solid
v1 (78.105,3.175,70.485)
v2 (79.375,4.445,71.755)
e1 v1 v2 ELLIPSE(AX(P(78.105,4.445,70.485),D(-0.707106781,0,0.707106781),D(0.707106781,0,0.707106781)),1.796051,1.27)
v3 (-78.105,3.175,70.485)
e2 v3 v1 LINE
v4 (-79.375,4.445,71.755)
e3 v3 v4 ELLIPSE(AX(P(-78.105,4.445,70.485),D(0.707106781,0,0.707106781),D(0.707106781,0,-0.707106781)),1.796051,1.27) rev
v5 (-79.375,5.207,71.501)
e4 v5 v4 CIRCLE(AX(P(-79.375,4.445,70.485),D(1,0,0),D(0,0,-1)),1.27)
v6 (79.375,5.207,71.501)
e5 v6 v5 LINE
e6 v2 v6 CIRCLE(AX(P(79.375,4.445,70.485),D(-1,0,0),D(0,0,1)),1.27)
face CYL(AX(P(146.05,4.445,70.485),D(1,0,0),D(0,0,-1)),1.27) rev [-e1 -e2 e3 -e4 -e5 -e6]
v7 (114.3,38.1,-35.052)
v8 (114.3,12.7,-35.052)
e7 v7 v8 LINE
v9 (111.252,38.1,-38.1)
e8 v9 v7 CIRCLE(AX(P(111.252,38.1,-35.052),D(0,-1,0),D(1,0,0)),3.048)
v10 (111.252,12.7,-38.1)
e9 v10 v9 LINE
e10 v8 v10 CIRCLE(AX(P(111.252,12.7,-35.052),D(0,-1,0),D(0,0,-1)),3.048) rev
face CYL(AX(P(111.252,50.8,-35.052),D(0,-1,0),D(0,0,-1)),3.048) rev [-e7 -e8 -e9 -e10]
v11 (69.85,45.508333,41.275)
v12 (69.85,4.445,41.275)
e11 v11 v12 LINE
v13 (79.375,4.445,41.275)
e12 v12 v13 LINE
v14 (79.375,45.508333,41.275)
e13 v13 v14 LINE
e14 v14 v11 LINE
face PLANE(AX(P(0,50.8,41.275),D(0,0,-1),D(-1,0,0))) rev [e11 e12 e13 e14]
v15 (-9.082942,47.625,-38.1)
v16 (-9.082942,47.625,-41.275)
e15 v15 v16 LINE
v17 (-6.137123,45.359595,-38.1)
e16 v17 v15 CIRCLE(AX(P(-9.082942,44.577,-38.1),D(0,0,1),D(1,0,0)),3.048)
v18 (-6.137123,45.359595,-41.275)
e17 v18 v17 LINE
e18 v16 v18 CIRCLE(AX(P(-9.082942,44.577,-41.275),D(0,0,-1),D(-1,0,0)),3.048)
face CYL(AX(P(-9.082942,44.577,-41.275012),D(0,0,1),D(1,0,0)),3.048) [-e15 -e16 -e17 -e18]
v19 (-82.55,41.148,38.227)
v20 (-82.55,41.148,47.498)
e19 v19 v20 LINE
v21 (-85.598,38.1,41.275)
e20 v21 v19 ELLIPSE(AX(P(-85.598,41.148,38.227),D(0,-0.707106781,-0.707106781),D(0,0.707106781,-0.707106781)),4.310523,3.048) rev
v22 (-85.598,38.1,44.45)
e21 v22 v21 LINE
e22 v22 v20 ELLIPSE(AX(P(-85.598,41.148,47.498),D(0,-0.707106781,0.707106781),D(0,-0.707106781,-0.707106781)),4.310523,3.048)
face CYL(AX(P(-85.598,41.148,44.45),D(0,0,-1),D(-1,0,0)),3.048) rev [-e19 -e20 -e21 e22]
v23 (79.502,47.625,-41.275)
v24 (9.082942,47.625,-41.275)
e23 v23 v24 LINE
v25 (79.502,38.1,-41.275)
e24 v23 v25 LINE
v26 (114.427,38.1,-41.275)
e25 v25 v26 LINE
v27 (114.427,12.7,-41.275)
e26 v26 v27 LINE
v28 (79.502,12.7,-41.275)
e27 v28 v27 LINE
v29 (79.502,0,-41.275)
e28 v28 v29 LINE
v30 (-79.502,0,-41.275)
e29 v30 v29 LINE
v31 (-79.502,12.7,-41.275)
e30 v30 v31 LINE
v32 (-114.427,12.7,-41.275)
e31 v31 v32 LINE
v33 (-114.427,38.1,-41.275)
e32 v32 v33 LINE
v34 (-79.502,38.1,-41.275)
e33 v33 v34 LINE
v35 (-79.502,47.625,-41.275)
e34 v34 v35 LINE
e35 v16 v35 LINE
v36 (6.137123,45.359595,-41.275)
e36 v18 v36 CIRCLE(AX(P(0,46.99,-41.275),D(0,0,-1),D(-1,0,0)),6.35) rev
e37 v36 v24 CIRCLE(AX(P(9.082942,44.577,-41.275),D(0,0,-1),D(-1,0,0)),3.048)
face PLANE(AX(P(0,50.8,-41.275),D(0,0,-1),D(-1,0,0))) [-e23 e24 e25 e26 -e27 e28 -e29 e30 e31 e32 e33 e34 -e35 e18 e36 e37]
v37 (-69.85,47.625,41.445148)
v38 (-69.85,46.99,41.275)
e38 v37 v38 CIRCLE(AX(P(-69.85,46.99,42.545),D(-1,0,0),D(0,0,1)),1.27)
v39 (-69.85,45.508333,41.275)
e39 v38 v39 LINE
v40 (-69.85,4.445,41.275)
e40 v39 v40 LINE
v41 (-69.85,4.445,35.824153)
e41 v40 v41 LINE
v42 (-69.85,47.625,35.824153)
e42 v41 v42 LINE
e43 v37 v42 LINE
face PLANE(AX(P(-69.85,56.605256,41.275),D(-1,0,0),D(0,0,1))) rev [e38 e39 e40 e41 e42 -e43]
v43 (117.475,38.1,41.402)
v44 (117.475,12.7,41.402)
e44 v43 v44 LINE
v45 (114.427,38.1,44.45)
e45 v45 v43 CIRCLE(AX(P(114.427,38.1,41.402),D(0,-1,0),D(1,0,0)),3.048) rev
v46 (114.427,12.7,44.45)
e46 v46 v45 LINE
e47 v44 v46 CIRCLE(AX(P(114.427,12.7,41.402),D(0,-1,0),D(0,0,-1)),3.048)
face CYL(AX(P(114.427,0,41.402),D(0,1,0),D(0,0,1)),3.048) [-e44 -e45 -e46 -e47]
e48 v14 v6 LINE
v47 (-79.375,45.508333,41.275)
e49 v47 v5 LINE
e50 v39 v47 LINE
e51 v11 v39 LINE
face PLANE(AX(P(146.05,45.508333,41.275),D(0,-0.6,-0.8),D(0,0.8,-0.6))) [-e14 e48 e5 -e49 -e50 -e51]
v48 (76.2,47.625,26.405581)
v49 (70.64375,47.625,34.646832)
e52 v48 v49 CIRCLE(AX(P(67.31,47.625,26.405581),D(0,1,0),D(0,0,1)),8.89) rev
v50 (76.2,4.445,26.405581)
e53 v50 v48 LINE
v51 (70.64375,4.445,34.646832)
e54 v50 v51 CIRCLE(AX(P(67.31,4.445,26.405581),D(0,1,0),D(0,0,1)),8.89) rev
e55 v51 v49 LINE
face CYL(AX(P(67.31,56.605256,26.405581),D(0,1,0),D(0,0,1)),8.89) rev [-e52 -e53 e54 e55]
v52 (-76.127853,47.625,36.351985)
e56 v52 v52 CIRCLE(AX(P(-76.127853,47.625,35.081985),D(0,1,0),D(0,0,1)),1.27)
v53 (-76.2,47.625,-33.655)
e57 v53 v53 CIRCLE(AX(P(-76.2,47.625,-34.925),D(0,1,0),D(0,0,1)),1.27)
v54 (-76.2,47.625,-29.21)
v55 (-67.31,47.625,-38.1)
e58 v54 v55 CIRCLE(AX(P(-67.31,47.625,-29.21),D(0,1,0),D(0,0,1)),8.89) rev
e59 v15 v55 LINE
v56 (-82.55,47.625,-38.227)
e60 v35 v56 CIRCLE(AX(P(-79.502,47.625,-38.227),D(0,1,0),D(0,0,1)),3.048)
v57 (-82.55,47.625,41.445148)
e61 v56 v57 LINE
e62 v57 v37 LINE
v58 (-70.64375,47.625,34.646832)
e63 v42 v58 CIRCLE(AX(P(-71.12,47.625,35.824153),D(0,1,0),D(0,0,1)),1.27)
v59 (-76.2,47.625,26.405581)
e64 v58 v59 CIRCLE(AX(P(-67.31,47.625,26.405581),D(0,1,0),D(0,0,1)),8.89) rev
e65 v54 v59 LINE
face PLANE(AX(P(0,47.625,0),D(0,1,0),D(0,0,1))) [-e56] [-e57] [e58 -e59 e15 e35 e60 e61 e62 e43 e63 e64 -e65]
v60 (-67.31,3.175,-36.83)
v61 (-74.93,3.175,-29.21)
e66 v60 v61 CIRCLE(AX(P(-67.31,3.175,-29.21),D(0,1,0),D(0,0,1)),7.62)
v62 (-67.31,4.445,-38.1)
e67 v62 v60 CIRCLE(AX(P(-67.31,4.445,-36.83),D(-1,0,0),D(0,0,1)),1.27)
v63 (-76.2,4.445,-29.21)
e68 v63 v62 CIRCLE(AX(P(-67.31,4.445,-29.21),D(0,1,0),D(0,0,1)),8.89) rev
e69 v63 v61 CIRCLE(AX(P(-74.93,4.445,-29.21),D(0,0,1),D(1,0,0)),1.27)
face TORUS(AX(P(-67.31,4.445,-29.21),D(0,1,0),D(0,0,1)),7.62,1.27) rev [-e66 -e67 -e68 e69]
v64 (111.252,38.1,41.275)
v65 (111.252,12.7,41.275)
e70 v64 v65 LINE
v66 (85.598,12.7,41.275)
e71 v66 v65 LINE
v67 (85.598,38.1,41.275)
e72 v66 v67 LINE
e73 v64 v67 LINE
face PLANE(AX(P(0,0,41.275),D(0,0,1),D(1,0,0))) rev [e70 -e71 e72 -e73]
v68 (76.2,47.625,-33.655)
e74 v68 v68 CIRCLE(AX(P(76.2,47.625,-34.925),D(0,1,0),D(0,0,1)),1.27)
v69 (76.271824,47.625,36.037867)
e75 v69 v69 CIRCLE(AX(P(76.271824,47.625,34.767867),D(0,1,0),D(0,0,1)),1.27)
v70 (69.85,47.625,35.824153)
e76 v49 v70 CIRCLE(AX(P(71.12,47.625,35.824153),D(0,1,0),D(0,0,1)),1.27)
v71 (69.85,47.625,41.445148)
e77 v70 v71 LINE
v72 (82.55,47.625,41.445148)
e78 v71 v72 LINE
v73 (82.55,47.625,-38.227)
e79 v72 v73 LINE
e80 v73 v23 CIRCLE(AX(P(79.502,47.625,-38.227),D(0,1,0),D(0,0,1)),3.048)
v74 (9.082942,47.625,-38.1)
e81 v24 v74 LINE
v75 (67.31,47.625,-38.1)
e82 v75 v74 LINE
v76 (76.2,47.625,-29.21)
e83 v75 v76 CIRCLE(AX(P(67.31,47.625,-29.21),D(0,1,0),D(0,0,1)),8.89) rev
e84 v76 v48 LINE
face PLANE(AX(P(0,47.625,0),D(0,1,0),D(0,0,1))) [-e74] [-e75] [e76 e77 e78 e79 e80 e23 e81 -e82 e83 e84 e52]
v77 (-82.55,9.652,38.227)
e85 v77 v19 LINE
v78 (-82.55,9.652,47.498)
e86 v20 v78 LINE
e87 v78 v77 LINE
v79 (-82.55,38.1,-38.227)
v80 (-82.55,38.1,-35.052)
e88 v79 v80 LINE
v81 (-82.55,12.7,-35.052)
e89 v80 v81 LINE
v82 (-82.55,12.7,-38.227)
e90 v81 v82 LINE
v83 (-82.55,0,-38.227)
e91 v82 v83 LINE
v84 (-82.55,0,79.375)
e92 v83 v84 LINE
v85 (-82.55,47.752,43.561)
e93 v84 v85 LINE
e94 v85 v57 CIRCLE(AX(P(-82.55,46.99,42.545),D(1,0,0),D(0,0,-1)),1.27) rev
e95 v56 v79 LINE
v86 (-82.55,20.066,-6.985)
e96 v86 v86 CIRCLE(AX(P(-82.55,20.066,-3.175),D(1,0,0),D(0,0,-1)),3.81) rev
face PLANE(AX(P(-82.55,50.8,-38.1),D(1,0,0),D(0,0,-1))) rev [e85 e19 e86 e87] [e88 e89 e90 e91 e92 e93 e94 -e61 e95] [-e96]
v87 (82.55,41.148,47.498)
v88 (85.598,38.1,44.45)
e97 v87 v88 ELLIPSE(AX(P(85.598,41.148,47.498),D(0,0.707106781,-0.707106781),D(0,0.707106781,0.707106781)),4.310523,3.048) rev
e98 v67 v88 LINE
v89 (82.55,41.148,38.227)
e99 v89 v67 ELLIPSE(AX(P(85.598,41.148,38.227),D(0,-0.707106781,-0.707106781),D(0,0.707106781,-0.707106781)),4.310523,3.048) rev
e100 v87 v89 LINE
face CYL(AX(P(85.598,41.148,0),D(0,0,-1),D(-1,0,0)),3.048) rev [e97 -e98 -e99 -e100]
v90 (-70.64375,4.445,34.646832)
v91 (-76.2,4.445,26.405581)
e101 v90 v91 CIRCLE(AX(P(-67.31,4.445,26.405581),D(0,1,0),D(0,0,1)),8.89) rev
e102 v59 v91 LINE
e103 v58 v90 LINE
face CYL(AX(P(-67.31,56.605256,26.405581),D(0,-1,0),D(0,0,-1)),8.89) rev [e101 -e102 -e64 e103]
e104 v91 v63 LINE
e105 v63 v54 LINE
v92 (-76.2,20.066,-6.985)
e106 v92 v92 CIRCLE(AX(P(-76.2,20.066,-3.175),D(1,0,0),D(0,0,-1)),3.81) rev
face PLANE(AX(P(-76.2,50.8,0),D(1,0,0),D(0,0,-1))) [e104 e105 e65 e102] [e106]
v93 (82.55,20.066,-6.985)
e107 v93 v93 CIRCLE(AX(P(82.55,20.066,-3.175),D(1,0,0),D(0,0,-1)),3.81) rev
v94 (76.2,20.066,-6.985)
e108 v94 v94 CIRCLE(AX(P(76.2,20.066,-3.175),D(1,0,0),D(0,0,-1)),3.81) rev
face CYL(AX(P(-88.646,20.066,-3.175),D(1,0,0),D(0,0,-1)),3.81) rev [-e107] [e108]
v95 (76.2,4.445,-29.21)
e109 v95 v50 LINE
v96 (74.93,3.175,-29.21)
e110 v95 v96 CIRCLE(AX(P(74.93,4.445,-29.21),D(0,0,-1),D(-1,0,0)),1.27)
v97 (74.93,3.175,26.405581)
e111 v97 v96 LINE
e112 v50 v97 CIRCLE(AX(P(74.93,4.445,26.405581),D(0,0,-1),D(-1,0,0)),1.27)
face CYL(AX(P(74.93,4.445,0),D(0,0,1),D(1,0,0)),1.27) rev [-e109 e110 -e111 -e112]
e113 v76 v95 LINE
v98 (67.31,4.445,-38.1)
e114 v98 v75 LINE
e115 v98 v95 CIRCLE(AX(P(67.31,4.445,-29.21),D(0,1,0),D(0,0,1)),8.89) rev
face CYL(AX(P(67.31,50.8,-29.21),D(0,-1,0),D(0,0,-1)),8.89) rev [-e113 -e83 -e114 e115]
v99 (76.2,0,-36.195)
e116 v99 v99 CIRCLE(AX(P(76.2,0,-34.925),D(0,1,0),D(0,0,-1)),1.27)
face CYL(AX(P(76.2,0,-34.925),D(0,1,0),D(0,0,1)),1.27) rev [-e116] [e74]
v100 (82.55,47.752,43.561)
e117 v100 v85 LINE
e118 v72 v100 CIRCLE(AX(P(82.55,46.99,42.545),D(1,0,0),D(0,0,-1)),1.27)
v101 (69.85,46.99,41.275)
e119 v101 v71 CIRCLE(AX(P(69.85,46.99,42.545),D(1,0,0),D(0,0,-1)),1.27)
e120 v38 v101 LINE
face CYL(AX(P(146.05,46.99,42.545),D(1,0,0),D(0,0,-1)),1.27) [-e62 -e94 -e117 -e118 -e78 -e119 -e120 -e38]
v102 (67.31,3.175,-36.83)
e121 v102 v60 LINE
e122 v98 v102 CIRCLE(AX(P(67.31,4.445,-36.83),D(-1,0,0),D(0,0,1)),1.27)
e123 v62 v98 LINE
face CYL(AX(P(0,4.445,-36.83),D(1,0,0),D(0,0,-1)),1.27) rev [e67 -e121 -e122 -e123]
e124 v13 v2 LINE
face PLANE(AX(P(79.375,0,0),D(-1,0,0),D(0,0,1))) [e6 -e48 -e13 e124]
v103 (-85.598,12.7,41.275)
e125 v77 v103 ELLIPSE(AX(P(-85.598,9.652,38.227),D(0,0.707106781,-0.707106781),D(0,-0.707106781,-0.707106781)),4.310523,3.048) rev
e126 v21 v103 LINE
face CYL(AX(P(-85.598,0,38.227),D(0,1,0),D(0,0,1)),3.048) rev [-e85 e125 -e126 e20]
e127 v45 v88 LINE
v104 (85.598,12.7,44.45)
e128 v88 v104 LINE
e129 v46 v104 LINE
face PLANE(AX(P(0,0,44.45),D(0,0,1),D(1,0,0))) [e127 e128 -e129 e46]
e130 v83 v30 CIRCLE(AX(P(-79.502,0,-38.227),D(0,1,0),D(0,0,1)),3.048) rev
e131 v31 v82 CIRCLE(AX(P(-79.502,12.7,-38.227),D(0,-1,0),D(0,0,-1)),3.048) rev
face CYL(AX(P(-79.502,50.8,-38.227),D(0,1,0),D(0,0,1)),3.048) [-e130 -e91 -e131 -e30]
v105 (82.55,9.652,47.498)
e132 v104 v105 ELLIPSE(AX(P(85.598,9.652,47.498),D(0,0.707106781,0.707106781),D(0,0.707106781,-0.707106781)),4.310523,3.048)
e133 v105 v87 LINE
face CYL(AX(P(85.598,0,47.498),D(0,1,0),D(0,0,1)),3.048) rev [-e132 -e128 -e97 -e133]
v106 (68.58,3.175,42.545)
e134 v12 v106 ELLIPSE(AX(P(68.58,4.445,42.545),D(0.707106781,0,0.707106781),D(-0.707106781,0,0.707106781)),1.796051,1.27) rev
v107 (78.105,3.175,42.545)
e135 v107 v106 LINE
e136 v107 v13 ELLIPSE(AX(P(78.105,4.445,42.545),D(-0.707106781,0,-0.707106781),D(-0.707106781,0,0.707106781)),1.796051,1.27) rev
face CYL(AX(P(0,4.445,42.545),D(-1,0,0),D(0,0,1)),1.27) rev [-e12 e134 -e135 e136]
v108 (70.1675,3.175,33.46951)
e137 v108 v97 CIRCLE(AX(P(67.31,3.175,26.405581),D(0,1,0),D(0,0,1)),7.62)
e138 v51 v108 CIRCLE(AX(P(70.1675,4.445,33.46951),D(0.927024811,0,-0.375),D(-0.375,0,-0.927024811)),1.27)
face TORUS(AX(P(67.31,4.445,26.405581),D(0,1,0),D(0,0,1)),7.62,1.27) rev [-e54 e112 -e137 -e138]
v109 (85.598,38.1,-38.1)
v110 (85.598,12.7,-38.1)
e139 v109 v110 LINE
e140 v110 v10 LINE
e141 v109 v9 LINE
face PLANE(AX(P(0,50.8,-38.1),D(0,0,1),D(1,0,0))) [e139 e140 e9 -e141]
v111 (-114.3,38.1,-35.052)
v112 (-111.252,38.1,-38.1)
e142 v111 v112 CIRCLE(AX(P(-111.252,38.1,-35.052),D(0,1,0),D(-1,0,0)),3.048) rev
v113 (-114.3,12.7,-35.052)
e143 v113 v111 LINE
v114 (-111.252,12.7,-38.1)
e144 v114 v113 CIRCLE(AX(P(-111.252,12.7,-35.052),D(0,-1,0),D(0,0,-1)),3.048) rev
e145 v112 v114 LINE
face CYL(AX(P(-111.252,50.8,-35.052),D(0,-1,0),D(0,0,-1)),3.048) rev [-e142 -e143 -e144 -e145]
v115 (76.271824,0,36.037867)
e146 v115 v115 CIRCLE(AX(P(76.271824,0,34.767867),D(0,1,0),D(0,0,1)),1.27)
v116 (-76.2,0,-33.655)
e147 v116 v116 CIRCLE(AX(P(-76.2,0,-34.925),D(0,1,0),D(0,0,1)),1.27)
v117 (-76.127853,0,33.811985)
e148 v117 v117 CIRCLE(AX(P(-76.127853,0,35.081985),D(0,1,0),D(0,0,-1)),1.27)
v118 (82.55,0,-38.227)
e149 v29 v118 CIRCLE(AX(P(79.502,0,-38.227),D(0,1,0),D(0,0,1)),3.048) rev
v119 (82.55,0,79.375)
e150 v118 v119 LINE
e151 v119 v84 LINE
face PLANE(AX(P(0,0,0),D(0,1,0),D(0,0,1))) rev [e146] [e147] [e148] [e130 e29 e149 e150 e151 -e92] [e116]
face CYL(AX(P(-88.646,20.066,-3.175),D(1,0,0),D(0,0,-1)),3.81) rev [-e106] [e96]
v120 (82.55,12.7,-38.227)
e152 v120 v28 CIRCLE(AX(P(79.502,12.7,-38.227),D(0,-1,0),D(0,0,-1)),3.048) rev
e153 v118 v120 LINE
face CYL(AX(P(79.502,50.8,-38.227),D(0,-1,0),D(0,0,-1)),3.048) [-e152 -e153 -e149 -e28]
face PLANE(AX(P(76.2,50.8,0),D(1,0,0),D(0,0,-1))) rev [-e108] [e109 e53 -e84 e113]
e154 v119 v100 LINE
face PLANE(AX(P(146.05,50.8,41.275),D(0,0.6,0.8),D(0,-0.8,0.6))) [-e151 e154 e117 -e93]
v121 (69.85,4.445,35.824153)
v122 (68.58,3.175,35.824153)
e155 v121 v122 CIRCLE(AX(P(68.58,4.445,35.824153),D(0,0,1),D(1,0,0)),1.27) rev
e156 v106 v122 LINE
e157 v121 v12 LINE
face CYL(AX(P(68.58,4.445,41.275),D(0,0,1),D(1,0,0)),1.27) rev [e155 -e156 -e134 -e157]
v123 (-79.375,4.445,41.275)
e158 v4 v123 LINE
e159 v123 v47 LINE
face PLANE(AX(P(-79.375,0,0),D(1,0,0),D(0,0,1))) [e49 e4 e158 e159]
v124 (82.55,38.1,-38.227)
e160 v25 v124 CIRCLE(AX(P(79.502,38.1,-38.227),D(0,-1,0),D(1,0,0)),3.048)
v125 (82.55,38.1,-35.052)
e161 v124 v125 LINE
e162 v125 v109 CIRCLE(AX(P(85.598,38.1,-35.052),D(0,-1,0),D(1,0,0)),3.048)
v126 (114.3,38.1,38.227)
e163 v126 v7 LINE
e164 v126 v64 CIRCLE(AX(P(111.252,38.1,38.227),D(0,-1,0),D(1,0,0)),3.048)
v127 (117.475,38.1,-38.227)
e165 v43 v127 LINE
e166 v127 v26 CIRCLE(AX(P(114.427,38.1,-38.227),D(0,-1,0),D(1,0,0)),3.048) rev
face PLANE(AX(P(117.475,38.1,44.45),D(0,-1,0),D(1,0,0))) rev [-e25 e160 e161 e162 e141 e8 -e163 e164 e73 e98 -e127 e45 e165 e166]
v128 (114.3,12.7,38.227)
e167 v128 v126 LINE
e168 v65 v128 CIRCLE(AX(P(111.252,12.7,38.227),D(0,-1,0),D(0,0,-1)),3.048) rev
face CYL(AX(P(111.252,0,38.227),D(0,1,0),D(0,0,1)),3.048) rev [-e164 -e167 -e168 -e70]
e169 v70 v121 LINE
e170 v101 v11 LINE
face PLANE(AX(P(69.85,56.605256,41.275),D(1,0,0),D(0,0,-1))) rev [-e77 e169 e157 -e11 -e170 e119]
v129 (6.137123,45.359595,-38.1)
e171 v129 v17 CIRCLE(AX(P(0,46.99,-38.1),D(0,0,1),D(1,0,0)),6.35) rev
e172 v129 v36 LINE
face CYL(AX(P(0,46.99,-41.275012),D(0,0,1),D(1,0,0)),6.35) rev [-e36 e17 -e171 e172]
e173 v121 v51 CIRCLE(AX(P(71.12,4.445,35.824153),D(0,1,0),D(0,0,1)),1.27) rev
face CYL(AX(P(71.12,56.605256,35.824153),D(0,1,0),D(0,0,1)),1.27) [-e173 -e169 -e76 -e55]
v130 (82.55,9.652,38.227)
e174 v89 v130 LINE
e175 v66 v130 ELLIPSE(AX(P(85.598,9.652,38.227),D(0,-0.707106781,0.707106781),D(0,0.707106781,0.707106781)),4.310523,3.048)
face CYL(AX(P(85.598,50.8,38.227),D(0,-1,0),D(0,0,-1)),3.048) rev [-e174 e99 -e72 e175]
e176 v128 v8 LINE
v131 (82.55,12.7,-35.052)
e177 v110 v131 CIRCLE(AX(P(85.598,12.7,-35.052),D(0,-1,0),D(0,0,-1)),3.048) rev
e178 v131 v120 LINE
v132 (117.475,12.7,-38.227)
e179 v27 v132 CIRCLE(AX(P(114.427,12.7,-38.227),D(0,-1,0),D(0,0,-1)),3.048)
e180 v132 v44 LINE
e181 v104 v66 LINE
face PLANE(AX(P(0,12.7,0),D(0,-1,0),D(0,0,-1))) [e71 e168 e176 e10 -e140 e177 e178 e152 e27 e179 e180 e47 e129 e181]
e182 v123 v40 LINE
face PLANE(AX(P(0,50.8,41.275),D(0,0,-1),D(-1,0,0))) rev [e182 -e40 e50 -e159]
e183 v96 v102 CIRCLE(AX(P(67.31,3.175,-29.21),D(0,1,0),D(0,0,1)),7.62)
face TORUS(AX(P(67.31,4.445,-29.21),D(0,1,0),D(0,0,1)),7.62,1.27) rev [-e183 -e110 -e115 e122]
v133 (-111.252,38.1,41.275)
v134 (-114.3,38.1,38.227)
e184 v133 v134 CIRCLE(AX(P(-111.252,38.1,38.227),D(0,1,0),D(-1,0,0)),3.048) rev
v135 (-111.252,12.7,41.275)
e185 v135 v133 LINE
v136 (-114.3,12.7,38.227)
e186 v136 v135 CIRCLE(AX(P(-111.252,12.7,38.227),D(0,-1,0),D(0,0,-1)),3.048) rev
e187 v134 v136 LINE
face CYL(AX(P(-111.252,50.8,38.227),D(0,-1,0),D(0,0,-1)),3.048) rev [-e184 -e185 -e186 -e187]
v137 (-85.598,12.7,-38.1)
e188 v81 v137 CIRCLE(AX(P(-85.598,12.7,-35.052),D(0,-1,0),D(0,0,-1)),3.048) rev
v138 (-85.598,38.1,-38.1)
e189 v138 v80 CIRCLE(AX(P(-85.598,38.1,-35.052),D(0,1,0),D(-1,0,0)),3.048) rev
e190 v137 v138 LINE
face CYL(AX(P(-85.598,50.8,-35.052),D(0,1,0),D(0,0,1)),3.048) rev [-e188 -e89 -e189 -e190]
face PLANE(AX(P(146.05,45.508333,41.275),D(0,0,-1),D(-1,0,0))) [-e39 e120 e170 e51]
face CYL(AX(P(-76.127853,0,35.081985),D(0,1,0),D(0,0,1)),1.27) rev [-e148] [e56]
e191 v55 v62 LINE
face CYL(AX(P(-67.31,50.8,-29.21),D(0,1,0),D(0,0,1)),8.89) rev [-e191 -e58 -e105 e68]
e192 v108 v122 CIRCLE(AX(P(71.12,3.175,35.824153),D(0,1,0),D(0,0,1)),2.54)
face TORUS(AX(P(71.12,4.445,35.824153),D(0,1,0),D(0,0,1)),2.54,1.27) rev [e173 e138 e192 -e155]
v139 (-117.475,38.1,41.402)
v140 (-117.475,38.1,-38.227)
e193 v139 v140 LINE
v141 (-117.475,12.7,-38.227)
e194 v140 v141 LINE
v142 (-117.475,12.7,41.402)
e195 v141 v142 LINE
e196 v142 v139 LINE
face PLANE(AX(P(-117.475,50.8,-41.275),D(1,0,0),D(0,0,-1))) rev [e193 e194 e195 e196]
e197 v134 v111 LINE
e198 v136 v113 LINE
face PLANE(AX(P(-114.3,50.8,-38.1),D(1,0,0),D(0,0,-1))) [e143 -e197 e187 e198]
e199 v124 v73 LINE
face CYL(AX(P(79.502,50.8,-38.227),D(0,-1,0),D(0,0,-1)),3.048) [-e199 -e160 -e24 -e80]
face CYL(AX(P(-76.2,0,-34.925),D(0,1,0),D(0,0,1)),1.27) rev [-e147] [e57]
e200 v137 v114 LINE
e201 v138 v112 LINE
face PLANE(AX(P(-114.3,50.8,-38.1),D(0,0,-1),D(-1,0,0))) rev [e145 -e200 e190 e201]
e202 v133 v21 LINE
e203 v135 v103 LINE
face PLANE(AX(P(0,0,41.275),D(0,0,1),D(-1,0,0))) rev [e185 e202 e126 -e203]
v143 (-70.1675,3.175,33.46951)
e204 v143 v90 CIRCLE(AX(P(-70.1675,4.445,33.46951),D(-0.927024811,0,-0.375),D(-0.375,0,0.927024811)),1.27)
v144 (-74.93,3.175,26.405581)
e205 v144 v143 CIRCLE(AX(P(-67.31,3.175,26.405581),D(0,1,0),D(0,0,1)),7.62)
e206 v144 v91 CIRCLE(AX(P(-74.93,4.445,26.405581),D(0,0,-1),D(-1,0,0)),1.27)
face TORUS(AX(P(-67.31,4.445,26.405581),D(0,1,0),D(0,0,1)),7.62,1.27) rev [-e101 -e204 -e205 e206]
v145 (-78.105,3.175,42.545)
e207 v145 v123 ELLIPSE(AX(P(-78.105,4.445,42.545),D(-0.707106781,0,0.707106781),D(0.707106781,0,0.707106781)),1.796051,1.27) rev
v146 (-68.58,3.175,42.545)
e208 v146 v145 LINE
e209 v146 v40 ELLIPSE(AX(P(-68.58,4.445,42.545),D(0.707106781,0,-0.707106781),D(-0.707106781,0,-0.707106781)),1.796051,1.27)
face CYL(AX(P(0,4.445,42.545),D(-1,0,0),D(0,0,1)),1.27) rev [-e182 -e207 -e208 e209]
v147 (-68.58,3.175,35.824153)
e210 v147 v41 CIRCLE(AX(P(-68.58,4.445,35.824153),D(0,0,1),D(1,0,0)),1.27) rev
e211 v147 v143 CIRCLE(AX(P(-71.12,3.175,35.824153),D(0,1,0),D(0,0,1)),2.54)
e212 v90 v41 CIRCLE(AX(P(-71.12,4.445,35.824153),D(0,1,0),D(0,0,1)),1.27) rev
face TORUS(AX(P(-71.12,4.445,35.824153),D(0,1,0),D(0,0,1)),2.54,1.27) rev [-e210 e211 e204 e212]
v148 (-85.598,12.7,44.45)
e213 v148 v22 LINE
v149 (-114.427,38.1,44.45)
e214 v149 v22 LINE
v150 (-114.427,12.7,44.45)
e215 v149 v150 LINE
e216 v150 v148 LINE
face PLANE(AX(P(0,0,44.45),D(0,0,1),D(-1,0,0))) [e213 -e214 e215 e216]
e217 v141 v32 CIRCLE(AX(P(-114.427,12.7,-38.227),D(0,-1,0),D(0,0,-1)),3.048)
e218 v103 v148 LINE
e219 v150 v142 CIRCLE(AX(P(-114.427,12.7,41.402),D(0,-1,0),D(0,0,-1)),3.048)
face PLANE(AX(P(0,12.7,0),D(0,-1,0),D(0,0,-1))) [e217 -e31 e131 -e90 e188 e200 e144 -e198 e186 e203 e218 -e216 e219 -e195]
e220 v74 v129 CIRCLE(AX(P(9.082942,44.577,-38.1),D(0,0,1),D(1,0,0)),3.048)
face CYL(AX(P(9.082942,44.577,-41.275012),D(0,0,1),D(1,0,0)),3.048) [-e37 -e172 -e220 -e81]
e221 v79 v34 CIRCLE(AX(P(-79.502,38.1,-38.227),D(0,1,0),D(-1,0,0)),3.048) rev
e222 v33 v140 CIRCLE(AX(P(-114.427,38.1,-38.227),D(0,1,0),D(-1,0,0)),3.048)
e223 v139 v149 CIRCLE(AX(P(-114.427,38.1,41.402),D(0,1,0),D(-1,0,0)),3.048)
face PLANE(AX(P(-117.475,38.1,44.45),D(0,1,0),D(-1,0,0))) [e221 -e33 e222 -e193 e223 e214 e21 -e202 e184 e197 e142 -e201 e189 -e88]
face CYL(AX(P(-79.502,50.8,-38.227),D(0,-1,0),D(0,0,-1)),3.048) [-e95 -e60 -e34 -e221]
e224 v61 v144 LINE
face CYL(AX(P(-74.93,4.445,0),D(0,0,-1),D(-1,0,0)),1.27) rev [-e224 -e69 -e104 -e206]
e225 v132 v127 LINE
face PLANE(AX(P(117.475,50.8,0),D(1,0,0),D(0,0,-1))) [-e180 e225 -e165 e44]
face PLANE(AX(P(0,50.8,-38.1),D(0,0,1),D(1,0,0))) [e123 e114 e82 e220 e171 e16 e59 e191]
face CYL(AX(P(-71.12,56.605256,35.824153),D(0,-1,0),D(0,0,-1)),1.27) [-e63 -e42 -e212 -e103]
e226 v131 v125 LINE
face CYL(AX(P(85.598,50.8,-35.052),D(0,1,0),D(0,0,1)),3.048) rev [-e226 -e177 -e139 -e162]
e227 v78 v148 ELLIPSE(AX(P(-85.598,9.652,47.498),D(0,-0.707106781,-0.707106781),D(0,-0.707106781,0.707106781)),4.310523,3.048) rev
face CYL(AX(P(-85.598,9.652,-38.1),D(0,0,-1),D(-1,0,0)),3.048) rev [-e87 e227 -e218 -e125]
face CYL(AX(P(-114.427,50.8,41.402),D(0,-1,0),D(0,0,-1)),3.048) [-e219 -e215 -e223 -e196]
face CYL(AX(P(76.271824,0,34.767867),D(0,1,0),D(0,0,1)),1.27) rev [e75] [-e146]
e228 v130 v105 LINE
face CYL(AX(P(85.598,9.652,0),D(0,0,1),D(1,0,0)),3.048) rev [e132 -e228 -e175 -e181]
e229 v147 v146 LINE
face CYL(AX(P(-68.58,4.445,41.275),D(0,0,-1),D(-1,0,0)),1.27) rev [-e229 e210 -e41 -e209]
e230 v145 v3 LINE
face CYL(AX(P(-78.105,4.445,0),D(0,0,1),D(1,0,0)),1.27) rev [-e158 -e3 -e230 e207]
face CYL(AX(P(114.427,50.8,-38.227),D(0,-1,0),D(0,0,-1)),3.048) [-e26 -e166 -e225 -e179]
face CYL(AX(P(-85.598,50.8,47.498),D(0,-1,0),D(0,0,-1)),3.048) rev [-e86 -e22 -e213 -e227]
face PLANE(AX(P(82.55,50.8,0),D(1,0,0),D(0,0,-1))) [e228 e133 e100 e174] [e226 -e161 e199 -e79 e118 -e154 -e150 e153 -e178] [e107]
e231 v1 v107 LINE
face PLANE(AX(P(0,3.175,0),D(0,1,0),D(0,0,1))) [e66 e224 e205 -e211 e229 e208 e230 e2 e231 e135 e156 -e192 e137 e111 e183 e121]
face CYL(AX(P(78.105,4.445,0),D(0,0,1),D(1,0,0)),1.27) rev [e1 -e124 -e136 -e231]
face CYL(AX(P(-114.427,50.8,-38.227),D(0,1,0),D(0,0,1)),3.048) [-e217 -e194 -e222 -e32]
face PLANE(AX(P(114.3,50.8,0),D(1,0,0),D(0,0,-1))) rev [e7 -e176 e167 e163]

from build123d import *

# Parameters (mm, degrees)
SKETCH1_W               = 152.4
SKETCH1_H               = 76.2
BOSS_EXTRUDE1_DEPTH     = 50.8
SKETCH1_3_W             = 152.4
SKETCH1_3_H             = 76.2
BOSS_EXTRUDE2_DEPTH     = 3.175
SKETCH8_W               = 152.4
SKETCH8_H               = 47.625
CUT_EXTRUDE1_DEPTH      = 6.35
BOSS_EXTRUDE10_REACH    = 212.462
BOSS_EXTRUDE11_DEPTH    = 3.175
SKETCH12_W              = 34.925
SKETCH12_H              = 38.1
BOSS_EXTRUDE12_DEPTH    = 3.175
CUT_EXTRUDE2_DEPTH      = 153.300748931
CUT_EXTRUDE2_DEPTH_BACK = 153.300748931
SKETCH13_W              = 34.925
SKETCH13_H              = 12.7
SKETCH14_W              = 34.925
SKETCH14_H              = 85.725
CUT_EXTRUDE3_DEPTH      = 12.7
CUT_EXTRUDE4_DEPTH      = 6.096
CUT_EXTRUDE4_DEPTH_BACK = 173.99
SKETCH16_R              = 3.81
SKETCH17_W              = 165.1
SKETCH17_H              = 82.55
CUT_EXTRUDE5_DEPTH      = 3.175
SKETCH25_W              = 6.35
SKETCH25_H              = 6.35
BOSS_EXTRUDE16_DEPTH    = 44.45
FILLET2_R               = 8.89
FILLET3_R               = 1.27
CUT_EXTRUDE8_DEPTH      = 150.562384559
CUT_EXTRUDE8_DEPTH_BACK = 150.562384559
SKETCH26_R              = 1.27
FILLET4_R               = 3.048
CUT_EXTRUDE9_DEPTH      = 176.173701579
CUT_EXTRUDE9_DEPTH_BACK = 7.366
SKETCH27_R              = 6.35
FILLET5_R               = 3.048


with BuildPart() as part:
    # Sketch1 → Boss-Extrude1 (new body)
    with BuildSketch(Plane(origin=(0, 0, 0), x_dir=(1, 0, 0), z_dir=(0, 1, 0))):
        Polygon((-117.475, 41.275), (-117.475, -41.275), (-114.3, -41.275), (-114.3, 38.1), (-82.55, 38.1), (-82.55, -41.275), (82.55, -41.275), (82.55, 38.1), (114.3, 38.1), (114.3, -41.275), (117.475, -41.275), (117.475, 41.275), align=None)
        Rectangle(SKETCH1_W, SKETCH1_H, mode=Mode.SUBTRACT)
    extrude(amount=BOSS_EXTRUDE1_DEPTH)

    # Sketch1<3> → Boss-Extrude2 (add)
    with BuildSketch(Plane(origin=(0, 0, 0), x_dir=(1, 0, 0), z_dir=(0, 1, 0))):
        Rectangle(SKETCH1_3_W, SKETCH1_3_H)
    extrude(amount=BOSS_EXTRUDE2_DEPTH)

    # Sketch8 → Cut-Extrude1 (cut)
    with BuildSketch(Plane.XY.offset(41.275)):
        with Locations((0, 26.9875)):
            Rectangle(SKETCH8_W, SKETCH8_H)
    extrude(amount=-CUT_EXTRUDE1_DEPTH, mode=Mode.SUBTRACT)

    # Boss-Extrude10: up to this face of the body (flat: up to its plane)
    boss_extrude10_end = Plane(part.part.faces().sort_by_distance((82.55, 25.4, 1.5875))[0])
    # Sketch10 → Boss-Extrude10 (add, up to the picked face)
    with BuildSketch(Plane.ZY.offset(82.55), mode=Mode.PRIVATE) as boss_extrude10_sk1:
        Polygon((41.275, 50.8), (79.375, 0), (41.275, 0), (41.275, 3.175), (73.025, 3.175), (41.275, 45.508333333), align=None)
    boss_extrude10_tool1 = split(extrude(boss_extrude10_sk1.sketch, amount=-BOSS_EXTRUDE10_REACH, mode=Mode.PRIVATE), bisect_by=boss_extrude10_end, keep=Keep.BOTH, mode=Mode.PRIVATE)
    add(boss_extrude10_tool1.solids().sort_by(Axis((-82.55, 25.019, 59.817), (1, 0, 0)))[0])

    # Sketch11 → Boss-Extrude11 (add)
    with BuildSketch(Plane(origin=(82.55, 0, 0), x_dir=(0, 0, -1), z_dir=(1, 0, 0))):
        Polygon((-41.275, 45.508333333), (-73.025, 3.175), (-41.275, 3.175), align=None)
    boss_extrude11 = extrude(amount=-BOSS_EXTRUDE11_DEPTH)

    # Sketch12 → Boss-Extrude12 (add)
    with BuildSketch(Plane.XY.offset(41.275)):
        with Locations((100.0125, 19.05)):
            Rectangle(SKETCH12_W, SKETCH12_H)
    boss_extrude12 = extrude(amount=BOSS_EXTRUDE12_DEPTH)

    # Mirror2: Boss-Extrude11 across plane
    add(boss_extrude11.mirror(Plane(origin=(0, 0, 0), x_dir=(0, 0, 1), z_dir=(1, 0, 0))))

    # Mirror3: Boss-Extrude12 across plane
    add(boss_extrude12.mirror(Plane(origin=(0, 0, 0), x_dir=(0, 0, 1), z_dir=(1, 0, 0))))

    # Sketch13 → Cut-Extrude2 (cut, two sides: drawn at the far end of the back side and taken through both)
    with BuildSketch(Plane.XY.offset(41.275).offset(-CUT_EXTRUDE2_DEPTH_BACK)):
        with Locations((100.0125, 44.45)):
            Rectangle(SKETCH13_W, SKETCH13_H)
        with Locations((-100.0125, 44.45)):
            Rectangle(SKETCH13_W, SKETCH13_H)
    extrude(amount=CUT_EXTRUDE2_DEPTH + CUT_EXTRUDE2_DEPTH_BACK, mode=Mode.SUBTRACT)

    # Sketch14 → Cut-Extrude3 (cut)
    with BuildSketch(Plane(origin=(0, 0, 0), x_dir=(-1, 0, 0), z_dir=(0, -1, 0))):
        with Locations((-100.0125, -1.5875)):
            Rectangle(SKETCH14_W, SKETCH14_H)
    cut_extrude3 = extrude(amount=-CUT_EXTRUDE3_DEPTH, mode=Mode.SUBTRACT)

    # Mirror4: Cut-Extrude3 across plane
    add(cut_extrude3.mirror(Plane(origin=(0, 0, 0), x_dir=(0, 0, 1), z_dir=(1, 0, 0))), mode=Mode.SUBTRACT)

    # Sketch16 → Cut-Extrude4 (cut, two sides: drawn at the far end of the back side and taken through both)
    with BuildSketch(Plane.ZY.offset(82.55).offset(-CUT_EXTRUDE4_DEPTH_BACK)):
        with Locations(Location((-3.175, 20.066, 0), (0, 0, 180))):
            Circle(SKETCH16_R)
    extrude(amount=CUT_EXTRUDE4_DEPTH + CUT_EXTRUDE4_DEPTH_BACK, mode=Mode.SUBTRACT)

    # Sketch17 → Cut-Extrude5 (cut)
    with BuildSketch(Plane(origin=(0, 50.8, 0), x_dir=(1, 0, 0), z_dir=(0, 1, 0))):
        Rectangle(SKETCH17_W, SKETCH17_H)
    extrude(amount=-CUT_EXTRUDE5_DEPTH, mode=Mode.SUBTRACT)

    # Sketch25 → Boss-Extrude16 (add)
    with BuildSketch(Plane(origin=(0, 3.175, 0), x_dir=(1, 0, 0), z_dir=(0, 1, 0))):
        with Locations((73.025, -38.1)):
            Rectangle(SKETCH25_W, SKETCH25_H)
        with Locations((-73.025, -38.1)):
            Rectangle(SKETCH25_W, SKETCH25_H)
    extrude(amount=BOSS_EXTRUDE16_DEPTH)

    # Fillet2
    # the kernel refuses this fillet: 8.89 mm, written as the material it adds along each edge
    with BuildSketch(Plane(origin=(76.2, 3.175, 34.925), x_dir=(0, 0, -1), z_dir=(0, 1, 0))) as fillet2_piece_1:
        with BuildLine():
            CenterArc((8.519418994, 8.89), FILLET2_R, 196.601549599, 73.398450401)
            Line((0, 6.35), (-0.17038838, 6.2992))
            ThreePointArc((-0.17038838, 6.2992), (-0.1778, 3.175), (-0.1778, 0))
            Line((-0.1778, 0), (0, -0.1778))
            Line((0, -0.1778), (8.519418994, -0.1778))
            Line((8.519418994, -0.1778), (8.519418994, 0))
        make_face()
    extrude(amount=44.45)
    with BuildSketch(Plane(origin=(76.2, 3.175, -38.1), x_dir=(-1, 0, 0), z_dir=(0, 1, 0)), Plane(origin=(-76.2, 3.175, -38.1), x_dir=(0, 0, 1), z_dir=(0, 1, 0))) as fillet2_piece_2:
        with BuildLine():
            CenterArc((FILLET2_R, FILLET2_R), FILLET2_R, 180, 90)
            Line((0, FILLET2_R), (-FILLET2_R * 0.02, FILLET2_R))
            Line((-FILLET2_R * 0.02, FILLET2_R), (-FILLET2_R * 0.02, -FILLET2_R * 0.02))
            Line((-FILLET2_R * 0.02, -FILLET2_R * 0.02), (FILLET2_R, -FILLET2_R * 0.02))
            Line((FILLET2_R, -FILLET2_R * 0.02), (FILLET2_R, 0))
        make_face()
    extrude(amount=44.45)
    with BuildSketch(Plane(origin=(-76.2, 3.175, 34.925), x_dir=(1, 0, 0), z_dir=(0, 1, 0))) as fillet2_piece_3:
        with BuildLine():
            CenterArc((8.89, 8.519418994), FILLET2_R, 180, 73.398450401)
            Line((0, 8.519418994), (-0.1778, 8.519418994))
            Line((-0.1778, 8.519418994), (-0.1778, 0))
            Line((-0.1778, 0), (0, -0.1778))
            ThreePointArc((0, -0.1778), (3.175, -0.1778), (6.2992, -0.17038838))
            Line((6.2992, -0.17038838), (6.35, 0))
        make_face()
    extrude(amount=44.45)

    # Fillet3
    fillet3_edges = [part.edges().sort_by_distance(p)[0] for p in [
        (74.6125, 3.175, 41.275),
        (79.375, 3.175, 57.15),
        (0, 3.175, 73.025),
        (-79.375, 3.175, 57.15),
        (-74.6125, 3.175, 41.275),
        (-69.85, 3.175, 38.1),
        (-74.437857322, 3.175, 31.718372174),
        (-76.2, 3.175, -1.402209497),
        (-73.596179285, 3.175, -35.496179285),
        (0, 3.175, -38.1),
        (73.596179285, 3.175, -35.496179285),
        (76.2, 3.175, -1.402209497),
        (74.437857322, 3.175, 31.718372174),
        (69.85, 3.175, 38.1),
        (-69.85, 25.4, 34.925),
        (69.85, 25.4, 34.925),
        (0, 50.8, 41.275),
    ]]
    fillet(fillet3_edges, radius=FILLET3_R)

    # Sketch26 → Cut-Extrude8 (cut, two sides: drawn at the far end of the back side and taken through both)
    with BuildSketch(Plane(origin=(0, 47.625, 0), x_dir=(1, 0, 0), z_dir=(0, 1, 0)).offset(-CUT_EXTRUDE8_DEPTH_BACK)):
        with Locations(Location((-76.2, 34.925, 0), (0, 0, 270))):
            Circle(SKETCH26_R)
        with Locations(Location((76.2, 34.925, 0), (0, 0, 270))):
            Circle(SKETCH26_R)
        with Locations(Location((76.271823643, -34.767866531, 0), (0, 0, 270))):
            Circle(SKETCH26_R)
        with Locations(Location((-76.127852634, -35.081985097, 0), (0, 0, 270))):
            Circle(SKETCH26_R)
    extrude(amount=CUT_EXTRUDE8_DEPTH + CUT_EXTRUDE8_DEPTH_BACK, mode=Mode.SUBTRACT)

    # Fillet4
    fillet4_edges = [part.edges().sort_by_distance(p)[0] for p in [
        (-114.3, 25.4, 41.275),
        (-114.3, 25.4, -38.1),
        (-82.55, 25.4, -38.1),
        (-82.55, 25.4, 41.275),
        (82.55, 25.4, 41.275),
        (114.3, 25.4, 41.275),
        (114.3, 25.4, -38.1),
        (82.55, 25.4, -38.1),
        (82.55, 12.7, 42.8625),
        (-82.55, 12.7, 42.8625),
        (-82.55, 38.1, 42.8625),
        (82.55, 38.1, 42.8625),
        (117.475, 25.4, -41.275),
        (117.475, 25.4, 44.45),
        (82.55, 25.4, 44.45),
        (-117.475, 25.4, 44.45),
        (-82.55, 25.4, 44.45),
        (-117.475, 25.4, -41.275),
        (-82.55, 6.35, -41.275),
        (82.55, 6.35, -41.275),
        (82.55, 42.8625, -41.275),
        (-82.55, 42.8625, -41.275),
    ]]
    fillet(fillet4_edges, radius=FILLET4_R)

    # Sketch27 → Cut-Extrude9 (cut, two sides: drawn at the far end of the back side and taken through both)
    with BuildSketch(Plane(origin=(0, 0, -41.275), x_dir=(-1, 0, 0), z_dir=(0, 0, -1)).offset(-CUT_EXTRUDE9_DEPTH_BACK)):
        with Locations((0, 46.99)):
            Circle(SKETCH27_R)
    extrude(amount=CUT_EXTRUDE9_DEPTH + CUT_EXTRUDE9_DEPTH_BACK, mode=Mode.SUBTRACT)

    # Fillet5
    fillet5_edges = [part.edges().sort_by_distance(p)[0] for p in [
        (6.318170226, 47.625, -39.6875),
        (-6.318170226, 47.625, -39.6875),
    ]]
    fillet(fillet5_edges, radius=FILLET5_R)


solid = part.part
